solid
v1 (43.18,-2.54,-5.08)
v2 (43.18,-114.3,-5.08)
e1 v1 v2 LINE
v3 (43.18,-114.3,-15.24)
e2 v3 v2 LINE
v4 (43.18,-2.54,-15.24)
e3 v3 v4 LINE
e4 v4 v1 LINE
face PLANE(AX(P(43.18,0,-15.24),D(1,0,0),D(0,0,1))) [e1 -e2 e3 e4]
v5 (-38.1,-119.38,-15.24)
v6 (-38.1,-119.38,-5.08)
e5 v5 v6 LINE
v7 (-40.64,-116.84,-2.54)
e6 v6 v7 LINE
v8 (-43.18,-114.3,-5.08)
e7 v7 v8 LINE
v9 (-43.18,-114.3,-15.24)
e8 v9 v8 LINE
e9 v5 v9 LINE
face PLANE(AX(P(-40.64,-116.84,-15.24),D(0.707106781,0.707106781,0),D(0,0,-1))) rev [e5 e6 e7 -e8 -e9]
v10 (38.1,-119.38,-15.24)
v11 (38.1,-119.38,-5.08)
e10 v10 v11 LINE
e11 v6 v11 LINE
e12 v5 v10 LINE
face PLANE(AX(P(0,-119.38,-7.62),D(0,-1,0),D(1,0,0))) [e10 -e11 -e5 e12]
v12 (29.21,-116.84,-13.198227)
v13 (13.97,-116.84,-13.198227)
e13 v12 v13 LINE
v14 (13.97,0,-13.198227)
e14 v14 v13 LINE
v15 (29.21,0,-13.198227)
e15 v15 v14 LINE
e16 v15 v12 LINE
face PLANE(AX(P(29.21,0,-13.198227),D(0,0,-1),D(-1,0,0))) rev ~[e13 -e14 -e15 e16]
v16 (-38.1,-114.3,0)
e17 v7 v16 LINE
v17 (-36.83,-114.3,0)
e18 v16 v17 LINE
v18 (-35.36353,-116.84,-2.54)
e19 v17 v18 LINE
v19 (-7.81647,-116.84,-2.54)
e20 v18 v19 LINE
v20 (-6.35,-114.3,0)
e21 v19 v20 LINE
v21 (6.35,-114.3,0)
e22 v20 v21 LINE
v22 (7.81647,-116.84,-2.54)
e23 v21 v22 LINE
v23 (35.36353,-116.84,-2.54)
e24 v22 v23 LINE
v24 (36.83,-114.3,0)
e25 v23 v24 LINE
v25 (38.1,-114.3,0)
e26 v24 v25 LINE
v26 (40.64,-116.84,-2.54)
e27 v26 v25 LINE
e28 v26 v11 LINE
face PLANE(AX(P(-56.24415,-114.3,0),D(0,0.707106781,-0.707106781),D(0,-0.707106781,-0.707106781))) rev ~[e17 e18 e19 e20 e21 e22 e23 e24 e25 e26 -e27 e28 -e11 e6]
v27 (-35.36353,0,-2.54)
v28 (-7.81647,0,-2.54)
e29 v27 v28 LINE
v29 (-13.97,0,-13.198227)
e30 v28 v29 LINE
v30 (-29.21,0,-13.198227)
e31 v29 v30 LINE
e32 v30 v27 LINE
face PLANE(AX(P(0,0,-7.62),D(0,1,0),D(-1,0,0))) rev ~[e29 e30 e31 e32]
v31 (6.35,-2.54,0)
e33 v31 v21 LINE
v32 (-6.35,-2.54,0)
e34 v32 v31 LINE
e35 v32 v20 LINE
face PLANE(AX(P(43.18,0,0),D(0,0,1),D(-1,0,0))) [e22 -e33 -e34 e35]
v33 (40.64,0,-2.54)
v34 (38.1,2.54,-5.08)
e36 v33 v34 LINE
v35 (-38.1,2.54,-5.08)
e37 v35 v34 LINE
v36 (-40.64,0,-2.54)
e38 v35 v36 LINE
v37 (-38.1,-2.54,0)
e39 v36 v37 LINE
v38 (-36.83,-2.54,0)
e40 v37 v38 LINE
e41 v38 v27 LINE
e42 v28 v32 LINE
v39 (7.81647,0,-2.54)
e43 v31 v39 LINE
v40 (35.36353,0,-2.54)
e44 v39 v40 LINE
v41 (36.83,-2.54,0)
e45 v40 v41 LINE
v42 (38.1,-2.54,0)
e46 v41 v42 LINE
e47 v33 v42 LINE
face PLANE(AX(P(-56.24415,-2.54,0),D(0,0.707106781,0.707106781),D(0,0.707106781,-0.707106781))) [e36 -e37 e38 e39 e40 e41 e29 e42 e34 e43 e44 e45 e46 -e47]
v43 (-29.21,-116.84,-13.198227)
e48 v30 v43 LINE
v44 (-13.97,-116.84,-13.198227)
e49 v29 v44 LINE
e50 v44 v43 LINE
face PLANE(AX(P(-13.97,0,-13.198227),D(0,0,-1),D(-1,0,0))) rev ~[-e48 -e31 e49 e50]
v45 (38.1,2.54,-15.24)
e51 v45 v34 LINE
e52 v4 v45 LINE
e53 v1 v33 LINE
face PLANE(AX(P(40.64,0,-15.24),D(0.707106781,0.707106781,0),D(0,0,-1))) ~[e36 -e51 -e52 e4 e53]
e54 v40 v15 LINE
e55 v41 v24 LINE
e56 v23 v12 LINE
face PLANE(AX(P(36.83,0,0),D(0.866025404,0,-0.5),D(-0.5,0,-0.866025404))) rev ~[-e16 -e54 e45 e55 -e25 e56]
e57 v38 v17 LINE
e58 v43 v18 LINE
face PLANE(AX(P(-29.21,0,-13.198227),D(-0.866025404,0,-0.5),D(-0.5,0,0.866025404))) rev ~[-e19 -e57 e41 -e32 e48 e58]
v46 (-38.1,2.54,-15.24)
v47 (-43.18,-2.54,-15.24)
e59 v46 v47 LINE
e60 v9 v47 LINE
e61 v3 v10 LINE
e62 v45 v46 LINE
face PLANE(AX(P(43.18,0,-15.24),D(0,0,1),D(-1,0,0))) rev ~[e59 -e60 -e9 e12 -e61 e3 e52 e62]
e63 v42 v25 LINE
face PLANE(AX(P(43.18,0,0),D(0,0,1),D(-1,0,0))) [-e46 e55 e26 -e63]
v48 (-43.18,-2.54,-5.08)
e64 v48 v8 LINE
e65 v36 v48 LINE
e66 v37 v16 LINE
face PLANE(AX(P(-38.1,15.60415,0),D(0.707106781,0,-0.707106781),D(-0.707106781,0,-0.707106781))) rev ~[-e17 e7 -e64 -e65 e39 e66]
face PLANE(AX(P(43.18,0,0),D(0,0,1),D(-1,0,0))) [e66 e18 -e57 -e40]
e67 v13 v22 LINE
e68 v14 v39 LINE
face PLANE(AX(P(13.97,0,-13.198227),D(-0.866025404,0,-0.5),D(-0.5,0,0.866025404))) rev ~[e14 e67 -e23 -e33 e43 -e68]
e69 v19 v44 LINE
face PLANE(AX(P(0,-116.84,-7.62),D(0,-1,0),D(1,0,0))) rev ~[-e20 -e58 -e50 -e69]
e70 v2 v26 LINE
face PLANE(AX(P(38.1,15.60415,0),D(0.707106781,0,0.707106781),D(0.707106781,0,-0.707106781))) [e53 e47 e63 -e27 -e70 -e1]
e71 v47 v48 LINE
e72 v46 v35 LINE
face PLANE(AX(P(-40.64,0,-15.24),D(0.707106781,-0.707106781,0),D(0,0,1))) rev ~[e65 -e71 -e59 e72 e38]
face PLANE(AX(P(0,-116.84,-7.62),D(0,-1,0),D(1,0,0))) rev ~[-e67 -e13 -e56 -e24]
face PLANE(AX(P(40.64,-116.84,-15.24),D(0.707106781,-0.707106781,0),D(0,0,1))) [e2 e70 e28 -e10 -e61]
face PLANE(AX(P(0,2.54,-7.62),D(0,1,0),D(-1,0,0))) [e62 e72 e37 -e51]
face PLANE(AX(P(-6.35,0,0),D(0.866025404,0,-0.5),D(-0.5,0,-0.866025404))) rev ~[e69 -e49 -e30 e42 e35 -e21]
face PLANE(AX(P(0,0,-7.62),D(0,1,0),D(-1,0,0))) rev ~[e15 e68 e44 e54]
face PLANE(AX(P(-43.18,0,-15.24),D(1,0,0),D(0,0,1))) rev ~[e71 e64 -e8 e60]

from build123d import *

# Parameters (mm, degrees)
F1_DEPTH    = 116.84
F2_W        = 86.36
F2_H        = 15.24
F3_DEPTH    = 2.54
F4_W        = 86.36
F4_H        = 15.24
F5_DEPTH    = 2.54
F6_T1_DEPTH = 148.0482991577
F6_T3_DEPTH = 112.4882991577
F7_SIZE     = 5.08


# Not quite as in the source:
# - a fillet or chamfer that OpenCascade refuses, or shapes differently, is made with other operations: its cross-section is extruded or revolved along the edge and cut away or added


with BuildPart() as f1:
    # F0 (on Front) → F1 (new body)
    with BuildSketch(Plane.XZ):
        Polygon((43.18, 0), (36.83, 0), (29.21, -13.1982271537), (13.97, -13.1982271537), (6.35, 0), (0, 0), (-6.35, 0), (-13.97, -13.1982271537), (-29.21, -13.1982271537), (-36.83, 0), (-43.18, 0), (-43.18, -15.24), (0, -15.24), (43.18, -15.24), align=None)
    extrude(amount=F1_DEPTH)

    # F2 (on face) → F3 (join)
    with BuildSketch(Plane.XZ.offset(116.84)):
        with Locations((0, -7.62)):
            Rectangle(F2_W, F2_H)
    extrude(amount=F3_DEPTH)

    # F4 (on face) → F5 (join)
    with BuildSketch(Plane(origin=(0, 0, 0), x_dir=(-1, 0, 0), z_dir=(0, 1, 0))):
        with Locations((0, -7.62)):
            Rectangle(F4_W, F4_H)
    extrude(amount=F5_DEPTH)

    # F6: chamfer of 5.08 on 4 edges, made by hand

    # F6_s2 → F6_t1 (cut)
    with BuildSketch(Plane.XZ.offset(-15.6041495789)):
        Polygon((-38.1, 0), (-43.18, -5.08), (-43.18, 0), align=None)
        Polygon((38.1, 0), (43.18, -5.08), (43.18, 0), align=None)
    extrude(amount=F6_T1_DEPTH, mode=Mode.SUBTRACT)

    # F6_s4 → F6_t3 (cut)
    with BuildSketch(Plane.YZ.offset(-56.2441495789)):
        Polygon((-114.3, 0), (-119.38, -5.08), (-119.38, 0), align=None)
        Polygon((-2.54, 0), (2.54, -5.08), (2.54, 0), align=None)
    extrude(amount=F6_T3_DEPTH, mode=Mode.SUBTRACT)

    # F7
    f7_edges = [f1.edges().sort_by_distance(p)[0] for p in [
        (-43.18, -119.38, -10.16),
        (43.18, -119.38, -10.16),
        (43.18, 2.54, -10.16),
        (-43.18, 2.54, -10.16),
    ]]
    chamfer(f7_edges, length=F7_SIZE)


solid = f1.part
